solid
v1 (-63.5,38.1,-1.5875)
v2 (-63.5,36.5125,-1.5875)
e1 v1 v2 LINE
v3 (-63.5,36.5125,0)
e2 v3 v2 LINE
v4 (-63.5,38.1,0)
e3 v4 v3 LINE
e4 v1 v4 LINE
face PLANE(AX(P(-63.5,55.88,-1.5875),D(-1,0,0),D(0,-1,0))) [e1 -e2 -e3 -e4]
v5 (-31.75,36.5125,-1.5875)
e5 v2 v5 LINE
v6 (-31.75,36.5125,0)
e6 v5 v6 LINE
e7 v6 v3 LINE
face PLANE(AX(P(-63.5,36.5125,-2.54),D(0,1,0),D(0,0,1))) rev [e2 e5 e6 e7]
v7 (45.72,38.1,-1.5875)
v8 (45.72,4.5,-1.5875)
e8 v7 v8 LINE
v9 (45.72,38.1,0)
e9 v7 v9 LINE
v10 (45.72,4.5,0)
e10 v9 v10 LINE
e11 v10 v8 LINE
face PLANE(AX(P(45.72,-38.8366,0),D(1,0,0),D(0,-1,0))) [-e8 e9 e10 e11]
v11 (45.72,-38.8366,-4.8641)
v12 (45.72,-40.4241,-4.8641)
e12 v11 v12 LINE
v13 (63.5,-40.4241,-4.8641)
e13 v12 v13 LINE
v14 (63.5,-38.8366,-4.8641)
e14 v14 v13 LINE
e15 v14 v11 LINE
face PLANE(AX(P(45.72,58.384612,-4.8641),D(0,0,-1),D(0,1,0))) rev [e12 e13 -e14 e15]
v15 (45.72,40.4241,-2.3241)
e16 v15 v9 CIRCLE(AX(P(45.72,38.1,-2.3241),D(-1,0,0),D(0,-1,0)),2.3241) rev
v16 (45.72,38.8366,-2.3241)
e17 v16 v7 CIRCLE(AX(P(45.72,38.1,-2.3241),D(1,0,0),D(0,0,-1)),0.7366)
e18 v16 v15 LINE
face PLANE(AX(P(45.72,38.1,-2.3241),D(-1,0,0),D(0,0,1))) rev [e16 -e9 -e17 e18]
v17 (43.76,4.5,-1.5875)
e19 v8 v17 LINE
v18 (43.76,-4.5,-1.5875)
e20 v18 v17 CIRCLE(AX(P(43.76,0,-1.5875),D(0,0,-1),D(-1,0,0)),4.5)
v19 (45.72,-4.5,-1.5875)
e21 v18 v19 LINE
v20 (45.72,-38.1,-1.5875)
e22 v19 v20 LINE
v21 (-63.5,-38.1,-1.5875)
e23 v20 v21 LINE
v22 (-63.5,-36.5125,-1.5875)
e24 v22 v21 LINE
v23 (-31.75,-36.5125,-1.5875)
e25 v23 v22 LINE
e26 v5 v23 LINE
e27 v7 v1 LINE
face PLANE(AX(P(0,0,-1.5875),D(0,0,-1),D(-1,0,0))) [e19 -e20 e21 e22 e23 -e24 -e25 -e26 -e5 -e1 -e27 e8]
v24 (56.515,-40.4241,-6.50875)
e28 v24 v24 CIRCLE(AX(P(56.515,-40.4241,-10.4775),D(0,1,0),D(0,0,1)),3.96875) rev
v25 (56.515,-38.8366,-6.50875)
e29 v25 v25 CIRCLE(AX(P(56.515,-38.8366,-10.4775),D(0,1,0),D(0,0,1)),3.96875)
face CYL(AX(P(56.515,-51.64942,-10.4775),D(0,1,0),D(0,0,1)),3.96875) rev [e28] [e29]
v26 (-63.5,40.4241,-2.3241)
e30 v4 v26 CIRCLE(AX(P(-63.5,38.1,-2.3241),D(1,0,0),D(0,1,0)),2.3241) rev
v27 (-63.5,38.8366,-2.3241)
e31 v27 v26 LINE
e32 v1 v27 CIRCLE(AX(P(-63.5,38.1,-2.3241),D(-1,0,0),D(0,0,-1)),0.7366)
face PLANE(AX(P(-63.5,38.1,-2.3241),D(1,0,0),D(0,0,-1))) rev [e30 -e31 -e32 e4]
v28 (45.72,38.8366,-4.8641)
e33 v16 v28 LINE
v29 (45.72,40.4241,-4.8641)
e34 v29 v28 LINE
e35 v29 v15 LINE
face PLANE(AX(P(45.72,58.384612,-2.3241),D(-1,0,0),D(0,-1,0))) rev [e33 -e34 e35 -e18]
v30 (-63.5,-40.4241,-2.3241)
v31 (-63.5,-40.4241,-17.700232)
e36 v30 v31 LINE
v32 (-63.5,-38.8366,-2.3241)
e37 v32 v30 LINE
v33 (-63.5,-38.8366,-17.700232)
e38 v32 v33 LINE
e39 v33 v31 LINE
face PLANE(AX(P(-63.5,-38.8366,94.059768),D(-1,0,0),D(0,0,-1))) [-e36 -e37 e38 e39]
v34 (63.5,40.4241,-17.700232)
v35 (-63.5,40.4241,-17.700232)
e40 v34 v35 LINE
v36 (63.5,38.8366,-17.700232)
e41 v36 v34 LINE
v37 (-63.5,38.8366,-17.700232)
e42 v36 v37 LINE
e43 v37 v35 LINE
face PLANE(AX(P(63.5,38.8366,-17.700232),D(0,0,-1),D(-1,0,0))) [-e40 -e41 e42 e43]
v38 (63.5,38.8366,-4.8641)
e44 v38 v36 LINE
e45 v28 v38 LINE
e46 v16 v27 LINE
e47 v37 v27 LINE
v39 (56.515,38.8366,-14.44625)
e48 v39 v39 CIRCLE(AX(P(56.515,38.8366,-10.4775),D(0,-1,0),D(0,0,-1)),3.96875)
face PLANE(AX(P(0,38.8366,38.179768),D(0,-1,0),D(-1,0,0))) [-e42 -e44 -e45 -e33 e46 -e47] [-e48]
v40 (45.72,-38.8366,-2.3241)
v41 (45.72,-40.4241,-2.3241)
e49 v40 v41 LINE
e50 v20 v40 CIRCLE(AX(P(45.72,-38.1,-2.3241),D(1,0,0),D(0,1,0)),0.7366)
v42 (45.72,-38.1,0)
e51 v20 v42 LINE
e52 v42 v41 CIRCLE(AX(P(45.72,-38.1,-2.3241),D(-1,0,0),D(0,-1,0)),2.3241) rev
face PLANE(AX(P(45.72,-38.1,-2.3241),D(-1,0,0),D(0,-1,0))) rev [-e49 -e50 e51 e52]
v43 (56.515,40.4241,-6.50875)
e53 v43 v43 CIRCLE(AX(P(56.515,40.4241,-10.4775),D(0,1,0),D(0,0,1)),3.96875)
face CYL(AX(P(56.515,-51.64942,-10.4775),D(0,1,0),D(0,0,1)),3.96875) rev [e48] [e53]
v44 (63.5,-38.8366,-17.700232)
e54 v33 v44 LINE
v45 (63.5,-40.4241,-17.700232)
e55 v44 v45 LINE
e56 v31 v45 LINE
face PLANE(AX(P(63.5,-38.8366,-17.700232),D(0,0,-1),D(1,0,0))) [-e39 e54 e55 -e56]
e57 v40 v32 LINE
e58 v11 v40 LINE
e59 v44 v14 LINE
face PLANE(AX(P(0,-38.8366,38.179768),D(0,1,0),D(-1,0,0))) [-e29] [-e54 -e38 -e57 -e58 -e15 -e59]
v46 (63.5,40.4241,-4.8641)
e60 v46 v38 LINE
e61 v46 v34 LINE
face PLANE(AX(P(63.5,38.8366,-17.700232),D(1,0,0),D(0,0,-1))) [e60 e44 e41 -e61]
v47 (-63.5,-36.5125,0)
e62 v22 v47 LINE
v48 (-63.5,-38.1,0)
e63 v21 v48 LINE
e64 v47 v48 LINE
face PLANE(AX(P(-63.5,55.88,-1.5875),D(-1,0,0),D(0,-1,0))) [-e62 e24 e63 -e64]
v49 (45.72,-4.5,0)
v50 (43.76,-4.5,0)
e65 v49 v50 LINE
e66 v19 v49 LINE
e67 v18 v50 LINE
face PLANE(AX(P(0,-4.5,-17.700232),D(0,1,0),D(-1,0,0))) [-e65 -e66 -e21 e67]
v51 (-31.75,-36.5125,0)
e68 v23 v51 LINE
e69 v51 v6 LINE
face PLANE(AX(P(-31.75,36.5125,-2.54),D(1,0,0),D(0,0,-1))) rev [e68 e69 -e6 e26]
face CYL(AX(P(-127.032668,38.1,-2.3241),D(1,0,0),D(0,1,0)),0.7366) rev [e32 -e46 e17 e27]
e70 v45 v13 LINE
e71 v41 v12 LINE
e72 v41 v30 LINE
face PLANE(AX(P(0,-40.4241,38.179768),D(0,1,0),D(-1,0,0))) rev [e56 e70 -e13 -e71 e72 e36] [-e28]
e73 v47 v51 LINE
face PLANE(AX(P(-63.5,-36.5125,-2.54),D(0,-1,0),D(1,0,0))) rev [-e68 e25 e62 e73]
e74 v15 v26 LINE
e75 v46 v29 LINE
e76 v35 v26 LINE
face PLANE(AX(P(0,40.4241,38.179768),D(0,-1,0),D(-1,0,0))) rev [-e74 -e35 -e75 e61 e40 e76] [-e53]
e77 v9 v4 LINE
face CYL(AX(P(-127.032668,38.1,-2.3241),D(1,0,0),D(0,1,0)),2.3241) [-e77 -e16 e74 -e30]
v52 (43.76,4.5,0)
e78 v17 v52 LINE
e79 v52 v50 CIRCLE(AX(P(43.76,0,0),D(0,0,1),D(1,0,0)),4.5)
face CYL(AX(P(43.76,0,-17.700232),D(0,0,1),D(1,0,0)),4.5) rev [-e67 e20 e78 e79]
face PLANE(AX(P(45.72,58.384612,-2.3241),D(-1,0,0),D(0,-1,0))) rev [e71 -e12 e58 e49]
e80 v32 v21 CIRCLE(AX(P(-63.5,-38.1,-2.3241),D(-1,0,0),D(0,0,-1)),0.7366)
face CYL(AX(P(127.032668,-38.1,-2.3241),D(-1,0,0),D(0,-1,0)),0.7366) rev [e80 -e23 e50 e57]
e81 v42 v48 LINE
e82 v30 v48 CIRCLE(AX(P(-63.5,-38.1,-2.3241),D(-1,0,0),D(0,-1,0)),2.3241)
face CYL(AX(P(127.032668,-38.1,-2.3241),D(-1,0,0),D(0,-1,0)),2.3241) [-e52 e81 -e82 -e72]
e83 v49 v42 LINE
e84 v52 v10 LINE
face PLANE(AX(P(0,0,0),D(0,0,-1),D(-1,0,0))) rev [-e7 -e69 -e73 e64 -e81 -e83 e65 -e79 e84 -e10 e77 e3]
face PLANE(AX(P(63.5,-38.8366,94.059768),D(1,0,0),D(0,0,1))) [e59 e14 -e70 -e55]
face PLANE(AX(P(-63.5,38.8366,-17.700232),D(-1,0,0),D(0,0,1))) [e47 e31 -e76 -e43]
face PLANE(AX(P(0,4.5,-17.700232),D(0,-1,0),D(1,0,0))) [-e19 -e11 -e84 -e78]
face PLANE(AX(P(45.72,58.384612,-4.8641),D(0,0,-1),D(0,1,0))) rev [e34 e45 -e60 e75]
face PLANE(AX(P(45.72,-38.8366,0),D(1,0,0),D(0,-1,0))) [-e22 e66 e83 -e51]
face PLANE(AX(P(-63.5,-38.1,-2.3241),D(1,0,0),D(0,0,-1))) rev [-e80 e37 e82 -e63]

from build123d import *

# Parameters (mm, degrees)
SKETCH1_W              = 127
SKETCH1_H              = 111.76
BASE_FLANGE1_DEPTH     = 1.5875
SKETCHED_START         = -63.5
SKETCHED_BEND1_DEPTH   = 127
SKETCHED_BEND1_2_DEPTH = 127
CUT_EXTRUDE2_START     = -2.3241
CUT_EXTRUDE2_OUTLINE_W = 17.78
CUT_EXTRUDE2_OUTLINE_H = 84
CUT_EXTRUDE2_DEPTH     = 2.3241
CUT_EXTRUDE1_REACH     = 106.317
SKETCH6_R              = 3.96875
CUT_EXTRUDE3_DEPTH     = 78.328235904
SKETCH34_W             = 31.75
SKETCH34_H             = 73.025
CUT_EXTRUDE5_DEPTH     = 2.54
CUT_EXTRUDE6_REACH     = 106.317
SKETCH49_W             = 17.78
SKETCH49_H             = 2.54


# Read off the part's stored shape, not the designer's step: Sketched Bend1, Cut-Extrude2
# Sheet-metal steps are written as plain solids
with BuildPart() as part:
    # Sketch1 → Base-Flange1 (new body)
    with BuildSketch(Plane.XY):
        Rectangle(SKETCH1_W, SKETCH1_H)
    extrude(amount=-BASE_FLANGE1_DEPTH)

    # Sketched Bend1 outline → Sketched Bend1 (cut)
    with BuildSketch(Plane.YZ.offset(SKETCHED_START)):
        with BuildLine():
            ThreePointArc((38.1, 0), (39.458217352, -0.438182071), (40.304282479, -1.5875))
            Line((40.304282479, -1.5875), (55.88, -1.5875))
            Line((55.88, -1.5875), (55.88, 0))
            Line((55.88, 0), (38.1, 0))
        make_face()
        with BuildLine():
            Line((-55.88, -1.5875), (-40.304282479, -1.5875))
            ThreePointArc((-40.304282479, -1.5875), (-39.458217352, -0.438182071), (-38.1, 0))
            Line((-38.1, 0), (-55.88, 0))
            Line((-55.88, 0), (-55.88, -1.5875))
        make_face()
    extrude(amount=SKETCHED_BEND1_DEPTH, mode=Mode.SUBTRACT)

    # Sketched Bend1 2 outline → Sketched Bend1 2 (add)
    with BuildSketch(Plane.YZ.offset(SKETCHED_START)):
        with BuildLine():
            ThreePointArc((38.1, -1.5875), (38.620854855, -1.803245145), (38.8366, -2.3241))
            Line((38.8366, -2.3241), (38.8366, -17.700231841))
            Line((38.8366, -17.700231841), (40.4241, -17.700231841))
            Line((40.4241, -17.700231841), (40.4241, -2.3241))
            ThreePointArc((40.4241, -2.3241), (40.393950056, -1.950959343), (40.304282479, -1.5875))
            Line((40.304282479, -1.5875), (38.1, -1.5875))
        make_face()
        with BuildLine():
            ThreePointArc((-38.8366, -2.3241), (-38.620854855, -1.803245145), (-38.1, -1.5875))
            Line((-38.1, -1.5875), (-40.304282479, -1.5875))
            ThreePointArc((-40.304282479, -1.5875), (-40.393950056, -1.950959343), (-40.4241, -2.3241))
            Line((-40.4241, -2.3241), (-40.4241, -17.700231841))
            Line((-40.4241, -17.700231841), (-38.8366, -17.700231841))
            Line((-38.8366, -17.700231841), (-38.8366, -2.3241))
        make_face()
    extrude(amount=SKETCHED_BEND1_2_DEPTH)

    # Cut-Extrude2 outline → Cut-Extrude2 (cut)
    with BuildSketch(Plane.XY.offset(CUT_EXTRUDE2_START)):
        with Locations((54.61, 0)):
            Rectangle(CUT_EXTRUDE2_OUTLINE_W, CUT_EXTRUDE2_OUTLINE_H)
    extrude(amount=CUT_EXTRUDE2_DEPTH, mode=Mode.SUBTRACT)

    # Cut-Extrude1: up to this face of the body (flat: up to its plane)
    cut_extrude1_end = Plane(part.part.faces().sort_by_distance((0, -40.4241, -10.012165921))[0])
    # Sketch6 → Cut-Extrude1 (cut, up to the picked face)
    with BuildSketch(Plane(origin=(0, 40.4241, 0), x_dir=(1, 0, 0), z_dir=(0, 1, 0)), mode=Mode.PRIVATE) as cut_extrude1_sk1:
        with Locations(Location((56.515, 10.4775, 0), (0, 0, 270))):
            Circle(SKETCH6_R)
    cut_extrude1_tool1 = split(extrude(cut_extrude1_sk1.sketch, amount=-CUT_EXTRUDE1_REACH, mode=Mode.PRIVATE), bisect_by=cut_extrude1_end, keep=Keep.BOTH, mode=Mode.PRIVATE)
    add(cut_extrude1_tool1.solids().sort_by(Axis((56.515, 40.4241, -10.4775), (0, -1, 0)))[0], mode=Mode.SUBTRACT)

    # Sketch13 → Cut-Extrude3 (cut, through all)
    with BuildSketch(Plane.XY):
        with BuildLine():
            ThreePointArc((45.72, 4.050728383), (44.765416013, 4.386244277), (43.76000011, 4.5))
            ThreePointArc((43.76000011, 4.5), (39.26000011, 0), (43.76000011, -4.5))
            ThreePointArc((43.76000011, -4.5), (44.765416013, -4.386244277), (45.72, -4.050728383))
            Line((45.72, -4.050728383), (45.72, 4.050728383))
        make_face()
        with BuildLine():
            ThreePointArc((48.26000011, 0), (47.572479586, 2.390606669), (45.72, 4.050728383))
            Line((45.72, 4.050728383), (45.72, -4.050728383))
            ThreePointArc((45.72, -4.050728383), (47.572479586, -2.390606669), (48.26000011, 0))
        make_face()
        with BuildLine():
            Line((45.72, 4.5), (43.76000011, 4.5))
            ThreePointArc((43.76000011, 4.5), (44.765416013, 4.386244277), (45.72, 4.050728383))
            Line((45.72, 4.050728383), (45.72, 4.5))
        make_face()
        with BuildLine():
            ThreePointArc((45.72, -4.050728383), (44.765416013, -4.386244277), (43.76000011, -4.5))
            Line((43.76000011, -4.5), (45.72, -4.5))
            Line((45.72, -4.5), (45.72, -4.050728383))
        make_face()
    extrude(amount=-CUT_EXTRUDE3_DEPTH, mode=Mode.SUBTRACT)

    # Sketch34 → Cut-Extrude5 (cut)
    with BuildSketch(Plane.XY):
        with Locations((-47.625, 0)):
            Rectangle(SKETCH34_W, SKETCH34_H)
    extrude(amount=-CUT_EXTRUDE5_DEPTH, mode=Mode.SUBTRACT)

    # Cut-Extrude6: up to this face of the body (flat: up to its plane)
    cut_extrude6_end = Plane(part.part.faces().sort_by_distance((-1.469322503, 40.4241, -10.00006779))[0])
    # Sketch49 → Cut-Extrude6 (cut, up to the picked face)
    with BuildSketch(Plane.XZ.offset(40.4241), mode=Mode.PRIVATE) as cut_extrude6_sk1:
        with Locations((54.61, -3.5941)):
            Rectangle(SKETCH49_W, SKETCH49_H)
    cut_extrude6_tool1 = split(extrude(cut_extrude6_sk1.sketch, amount=-CUT_EXTRUDE6_REACH, mode=Mode.PRIVATE), bisect_by=cut_extrude6_end, keep=Keep.BOTH, mode=Mode.PRIVATE)
    add(cut_extrude6_tool1.solids().sort_by(Axis((54.61, -40.4241, -3.5941), (0, 1, 0)))[0], mode=Mode.SUBTRACT)


solid = part.part
